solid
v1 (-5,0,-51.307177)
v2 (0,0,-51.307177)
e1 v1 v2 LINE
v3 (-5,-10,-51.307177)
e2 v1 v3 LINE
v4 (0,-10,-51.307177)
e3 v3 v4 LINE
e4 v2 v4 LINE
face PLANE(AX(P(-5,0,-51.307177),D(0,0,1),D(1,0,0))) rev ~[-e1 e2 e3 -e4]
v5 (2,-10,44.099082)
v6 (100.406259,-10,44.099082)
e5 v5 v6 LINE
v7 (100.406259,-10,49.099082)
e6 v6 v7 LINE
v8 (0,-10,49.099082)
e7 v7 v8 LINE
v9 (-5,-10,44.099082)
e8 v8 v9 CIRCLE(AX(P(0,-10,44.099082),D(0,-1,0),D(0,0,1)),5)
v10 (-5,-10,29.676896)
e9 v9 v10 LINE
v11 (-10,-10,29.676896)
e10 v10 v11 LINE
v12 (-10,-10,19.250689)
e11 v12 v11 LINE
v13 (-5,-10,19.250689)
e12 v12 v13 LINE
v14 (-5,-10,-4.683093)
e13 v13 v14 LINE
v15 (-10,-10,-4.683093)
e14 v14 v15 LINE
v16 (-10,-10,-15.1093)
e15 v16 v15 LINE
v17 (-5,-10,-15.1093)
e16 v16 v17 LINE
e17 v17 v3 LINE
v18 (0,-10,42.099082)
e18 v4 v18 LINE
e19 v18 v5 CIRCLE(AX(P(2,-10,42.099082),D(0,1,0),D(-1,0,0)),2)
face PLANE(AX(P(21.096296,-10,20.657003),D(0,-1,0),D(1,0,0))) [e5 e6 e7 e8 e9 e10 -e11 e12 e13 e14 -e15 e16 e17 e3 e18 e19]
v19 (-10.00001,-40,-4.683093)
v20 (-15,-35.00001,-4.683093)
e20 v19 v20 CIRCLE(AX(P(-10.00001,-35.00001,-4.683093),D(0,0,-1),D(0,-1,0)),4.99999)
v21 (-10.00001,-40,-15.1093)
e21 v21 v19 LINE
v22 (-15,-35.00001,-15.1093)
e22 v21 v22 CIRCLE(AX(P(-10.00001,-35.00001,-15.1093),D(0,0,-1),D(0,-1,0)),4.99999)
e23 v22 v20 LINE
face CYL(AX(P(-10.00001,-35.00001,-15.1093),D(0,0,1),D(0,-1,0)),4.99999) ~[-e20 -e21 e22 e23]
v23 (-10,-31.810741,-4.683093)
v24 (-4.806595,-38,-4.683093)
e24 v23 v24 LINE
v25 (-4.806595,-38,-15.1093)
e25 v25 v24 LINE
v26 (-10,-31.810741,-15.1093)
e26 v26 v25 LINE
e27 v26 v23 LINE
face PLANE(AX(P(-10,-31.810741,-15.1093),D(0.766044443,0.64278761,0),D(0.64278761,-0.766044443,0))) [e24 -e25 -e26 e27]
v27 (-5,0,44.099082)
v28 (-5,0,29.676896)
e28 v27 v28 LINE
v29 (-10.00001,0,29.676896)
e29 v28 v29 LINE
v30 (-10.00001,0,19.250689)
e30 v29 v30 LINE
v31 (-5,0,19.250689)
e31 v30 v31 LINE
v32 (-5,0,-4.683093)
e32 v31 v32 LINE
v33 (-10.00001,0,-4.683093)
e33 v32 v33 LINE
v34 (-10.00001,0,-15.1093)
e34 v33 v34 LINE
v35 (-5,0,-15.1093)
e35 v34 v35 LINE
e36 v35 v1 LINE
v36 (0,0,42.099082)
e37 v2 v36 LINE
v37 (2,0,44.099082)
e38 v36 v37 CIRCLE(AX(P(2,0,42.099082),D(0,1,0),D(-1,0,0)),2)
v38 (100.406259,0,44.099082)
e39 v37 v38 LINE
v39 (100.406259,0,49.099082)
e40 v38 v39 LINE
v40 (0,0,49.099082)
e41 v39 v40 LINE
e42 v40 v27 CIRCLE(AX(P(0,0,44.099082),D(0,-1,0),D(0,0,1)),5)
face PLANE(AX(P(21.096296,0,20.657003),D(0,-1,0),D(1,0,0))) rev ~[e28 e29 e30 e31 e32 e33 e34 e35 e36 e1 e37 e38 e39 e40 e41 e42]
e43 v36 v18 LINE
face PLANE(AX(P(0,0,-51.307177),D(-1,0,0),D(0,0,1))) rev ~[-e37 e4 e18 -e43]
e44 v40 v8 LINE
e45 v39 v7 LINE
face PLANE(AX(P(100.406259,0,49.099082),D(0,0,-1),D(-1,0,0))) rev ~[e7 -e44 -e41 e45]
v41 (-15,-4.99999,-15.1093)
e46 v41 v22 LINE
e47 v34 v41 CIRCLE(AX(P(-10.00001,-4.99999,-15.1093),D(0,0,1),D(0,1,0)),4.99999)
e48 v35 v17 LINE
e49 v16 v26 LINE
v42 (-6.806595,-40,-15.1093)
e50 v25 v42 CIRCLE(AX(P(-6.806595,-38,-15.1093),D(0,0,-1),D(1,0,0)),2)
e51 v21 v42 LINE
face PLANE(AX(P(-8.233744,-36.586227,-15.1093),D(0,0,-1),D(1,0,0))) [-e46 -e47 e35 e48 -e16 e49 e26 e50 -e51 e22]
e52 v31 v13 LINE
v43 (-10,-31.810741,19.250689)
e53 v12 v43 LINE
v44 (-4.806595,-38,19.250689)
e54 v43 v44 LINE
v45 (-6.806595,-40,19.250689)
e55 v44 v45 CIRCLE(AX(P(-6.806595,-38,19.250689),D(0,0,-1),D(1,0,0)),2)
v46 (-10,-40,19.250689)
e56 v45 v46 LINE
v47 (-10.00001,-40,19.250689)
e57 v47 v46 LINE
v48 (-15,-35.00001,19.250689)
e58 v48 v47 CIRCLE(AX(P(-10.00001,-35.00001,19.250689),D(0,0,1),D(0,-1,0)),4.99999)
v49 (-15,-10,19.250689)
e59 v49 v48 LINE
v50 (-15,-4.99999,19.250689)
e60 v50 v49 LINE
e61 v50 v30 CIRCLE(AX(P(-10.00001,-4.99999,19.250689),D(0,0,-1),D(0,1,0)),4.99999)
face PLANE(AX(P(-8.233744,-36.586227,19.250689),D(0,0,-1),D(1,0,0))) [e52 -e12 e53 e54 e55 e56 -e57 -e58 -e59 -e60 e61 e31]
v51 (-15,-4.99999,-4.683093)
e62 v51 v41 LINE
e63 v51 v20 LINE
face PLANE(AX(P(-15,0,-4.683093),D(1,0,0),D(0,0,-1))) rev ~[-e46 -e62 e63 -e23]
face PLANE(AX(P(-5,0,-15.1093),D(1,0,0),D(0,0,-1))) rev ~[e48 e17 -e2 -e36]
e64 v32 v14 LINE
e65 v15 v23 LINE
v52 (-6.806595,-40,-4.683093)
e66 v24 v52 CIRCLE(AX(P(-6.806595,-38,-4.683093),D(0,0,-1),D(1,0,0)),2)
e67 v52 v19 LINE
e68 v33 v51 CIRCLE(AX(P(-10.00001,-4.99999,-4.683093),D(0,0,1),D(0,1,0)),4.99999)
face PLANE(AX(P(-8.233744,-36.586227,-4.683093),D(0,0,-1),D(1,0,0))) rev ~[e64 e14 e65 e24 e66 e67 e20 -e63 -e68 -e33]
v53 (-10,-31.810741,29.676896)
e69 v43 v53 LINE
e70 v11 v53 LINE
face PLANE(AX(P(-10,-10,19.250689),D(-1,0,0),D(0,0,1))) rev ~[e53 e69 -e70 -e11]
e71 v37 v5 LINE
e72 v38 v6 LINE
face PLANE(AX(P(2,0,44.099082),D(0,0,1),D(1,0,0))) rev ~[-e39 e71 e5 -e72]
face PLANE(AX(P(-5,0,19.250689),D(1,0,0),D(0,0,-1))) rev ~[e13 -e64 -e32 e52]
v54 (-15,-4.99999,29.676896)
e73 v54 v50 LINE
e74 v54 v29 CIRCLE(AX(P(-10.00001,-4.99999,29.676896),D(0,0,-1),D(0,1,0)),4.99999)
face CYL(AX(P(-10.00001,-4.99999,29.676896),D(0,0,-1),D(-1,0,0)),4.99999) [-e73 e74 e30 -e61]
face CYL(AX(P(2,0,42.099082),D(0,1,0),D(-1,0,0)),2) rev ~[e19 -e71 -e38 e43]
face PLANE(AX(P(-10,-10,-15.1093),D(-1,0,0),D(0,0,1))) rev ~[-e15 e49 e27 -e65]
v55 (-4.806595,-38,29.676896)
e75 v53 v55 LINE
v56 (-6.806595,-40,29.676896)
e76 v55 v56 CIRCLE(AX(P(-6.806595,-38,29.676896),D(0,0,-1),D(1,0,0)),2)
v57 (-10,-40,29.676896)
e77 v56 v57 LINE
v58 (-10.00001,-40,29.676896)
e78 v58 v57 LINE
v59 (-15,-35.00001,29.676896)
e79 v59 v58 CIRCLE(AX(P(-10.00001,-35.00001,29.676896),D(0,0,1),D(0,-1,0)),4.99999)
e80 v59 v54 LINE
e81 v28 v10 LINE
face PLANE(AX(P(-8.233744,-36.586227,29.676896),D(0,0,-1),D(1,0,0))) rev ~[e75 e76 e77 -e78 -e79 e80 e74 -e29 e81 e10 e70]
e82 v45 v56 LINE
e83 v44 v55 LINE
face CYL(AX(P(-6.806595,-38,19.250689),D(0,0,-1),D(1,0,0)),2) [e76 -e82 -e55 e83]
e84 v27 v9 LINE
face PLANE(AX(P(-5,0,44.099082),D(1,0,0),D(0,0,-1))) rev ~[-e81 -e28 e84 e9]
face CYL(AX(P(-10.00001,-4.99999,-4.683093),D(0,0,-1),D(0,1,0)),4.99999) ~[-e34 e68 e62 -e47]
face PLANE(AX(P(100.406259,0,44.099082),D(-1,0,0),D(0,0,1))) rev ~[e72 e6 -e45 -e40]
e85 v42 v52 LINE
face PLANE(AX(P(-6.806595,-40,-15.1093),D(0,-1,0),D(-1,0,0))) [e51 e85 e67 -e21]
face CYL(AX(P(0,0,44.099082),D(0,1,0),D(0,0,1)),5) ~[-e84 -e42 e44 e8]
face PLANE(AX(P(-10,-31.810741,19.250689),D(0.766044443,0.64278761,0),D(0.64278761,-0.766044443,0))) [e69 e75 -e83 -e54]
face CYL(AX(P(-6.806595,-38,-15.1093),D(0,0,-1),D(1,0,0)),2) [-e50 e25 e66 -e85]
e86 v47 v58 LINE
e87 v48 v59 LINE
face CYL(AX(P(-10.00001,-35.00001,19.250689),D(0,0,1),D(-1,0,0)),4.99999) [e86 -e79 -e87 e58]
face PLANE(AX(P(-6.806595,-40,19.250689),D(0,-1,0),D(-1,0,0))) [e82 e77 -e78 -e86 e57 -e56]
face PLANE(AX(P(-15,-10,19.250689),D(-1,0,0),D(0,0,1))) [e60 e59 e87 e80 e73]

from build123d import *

# Parameters (mm, degrees)
F1_DEPTH = 10
F2_W     = 5
F2_H     = 10.4262067128
F3_DEPTH = 30
F4_R     = 4.99999
F6_DEPTH = 10.4262067128
F8_DEPTH = 10.4262067128


# Not quite as in the source:
# - a fillet or chamfer is up to 0.001 mm smaller than in the source, because OpenCascade refuses the exact size


with BuildPart() as f1:
    # F0 (on Front) → F1 (new body)
    with BuildSketch(Plane.XZ):
        with BuildLine():
            Line((-5, -51.3071772588), (0, -51.3071772588))
            Line((0, -51.3071772588), (0, 42.0990820395))
            ThreePointArc((0, 42.0990820395), (0.5857864376, 43.5132956019), (2, 44.0990820395))
            Line((2, 44.0990820395), (100.4062592983, 44.0990820395))
            Line((100.4062592983, 44.0990820395), (100.4062592983, 49.0990820395))
            Line((100.4062592983, 49.0990820395), (0, 49.0990820395))
            ThreePointArc((0, 49.0990820395), (-3.5355339059, 47.6346159455), (-5, 44.0990820395))
            Line((-5, 44.0990820395), (-5, 29.6768955886))
            Line((-5, 29.6768955886), (-15, 29.6768955886))
            Line((-15, 29.6768955886), (-15, 19.2506888759))
            Line((-15, 19.2506888759), (-5, 19.2506888759))
            Line((-5, 19.2506888759), (-5, -4.6830929693))
            Line((-5, -4.6830929693), (-15, -4.6830929693))
            Line((-15, -4.6830929693), (-15, -15.1092996821))
            Line((-15, -15.1092996821), (-5, -15.1092996821))
            Line((-5, -15.1092996821), (-5, -51.3071772588))
        make_face()
    extrude(amount=F1_DEPTH)

    # F2 (on face) → F3 (join)
    with BuildSketch(Plane.XZ.offset(10)):
        with Locations((-12.5, 24.4637922322)):
            Rectangle(F2_W, F2_H)
        with Locations((-12.5, -9.8961963257)):
            Rectangle(F2_W, F2_H)
    extrude(amount=F3_DEPTH)

    # F4 (radius 5 in the source; OpenCascade refuses exactly that, so slightly less here)
    f4_edges = [f1.edges().sort_by_distance(p)[0] for p in [
        (-15, -40, 24.463792),
        (-15, -40, -9.896196),
        (-15, 0, 24.463792),
        (-15, 0, -9.896196),
    ]]
    fillet(f4_edges, radius=F4_R)

    # F5 (on face) → F6 (join, through all)
    with BuildSketch(Plane(origin=(0, 0, -15.1092996821), x_dir=(1, 0, 0), z_dir=(0, 0, -1))):
        with BuildLine():
            Line((-6.8065949231, 40), (-10, 40))
            Line((-10, 40), (-10, 31.8107408419))
            Line((-10, 31.8107408419), (-4.8065949231, 38))
            ThreePointArc((-4.8065949231, 38), (-5.3923813608, 39.4142135624), (-6.8065949231, 40))
        make_face()
    extrude(amount=-F6_DEPTH)

    # F7 (on face) → F8 (join, through all)
    with BuildSketch(Plane(origin=(0, 0, 19.2506888759), x_dir=(1, 0, 0), z_dir=(0, 0, -1))):
        with BuildLine():
            Line((-6.8065949231, 40), (-10, 40))
            Line((-10, 40), (-10, 31.8107408419))
            Line((-10, 31.8107408419), (-4.8065949231, 38))
            ThreePointArc((-4.8065949231, 38), (-5.3923813608, 39.4142135624), (-6.8065949231, 40))
        make_face()
    extrude(amount=-F8_DEPTH)


solid = f1.part
